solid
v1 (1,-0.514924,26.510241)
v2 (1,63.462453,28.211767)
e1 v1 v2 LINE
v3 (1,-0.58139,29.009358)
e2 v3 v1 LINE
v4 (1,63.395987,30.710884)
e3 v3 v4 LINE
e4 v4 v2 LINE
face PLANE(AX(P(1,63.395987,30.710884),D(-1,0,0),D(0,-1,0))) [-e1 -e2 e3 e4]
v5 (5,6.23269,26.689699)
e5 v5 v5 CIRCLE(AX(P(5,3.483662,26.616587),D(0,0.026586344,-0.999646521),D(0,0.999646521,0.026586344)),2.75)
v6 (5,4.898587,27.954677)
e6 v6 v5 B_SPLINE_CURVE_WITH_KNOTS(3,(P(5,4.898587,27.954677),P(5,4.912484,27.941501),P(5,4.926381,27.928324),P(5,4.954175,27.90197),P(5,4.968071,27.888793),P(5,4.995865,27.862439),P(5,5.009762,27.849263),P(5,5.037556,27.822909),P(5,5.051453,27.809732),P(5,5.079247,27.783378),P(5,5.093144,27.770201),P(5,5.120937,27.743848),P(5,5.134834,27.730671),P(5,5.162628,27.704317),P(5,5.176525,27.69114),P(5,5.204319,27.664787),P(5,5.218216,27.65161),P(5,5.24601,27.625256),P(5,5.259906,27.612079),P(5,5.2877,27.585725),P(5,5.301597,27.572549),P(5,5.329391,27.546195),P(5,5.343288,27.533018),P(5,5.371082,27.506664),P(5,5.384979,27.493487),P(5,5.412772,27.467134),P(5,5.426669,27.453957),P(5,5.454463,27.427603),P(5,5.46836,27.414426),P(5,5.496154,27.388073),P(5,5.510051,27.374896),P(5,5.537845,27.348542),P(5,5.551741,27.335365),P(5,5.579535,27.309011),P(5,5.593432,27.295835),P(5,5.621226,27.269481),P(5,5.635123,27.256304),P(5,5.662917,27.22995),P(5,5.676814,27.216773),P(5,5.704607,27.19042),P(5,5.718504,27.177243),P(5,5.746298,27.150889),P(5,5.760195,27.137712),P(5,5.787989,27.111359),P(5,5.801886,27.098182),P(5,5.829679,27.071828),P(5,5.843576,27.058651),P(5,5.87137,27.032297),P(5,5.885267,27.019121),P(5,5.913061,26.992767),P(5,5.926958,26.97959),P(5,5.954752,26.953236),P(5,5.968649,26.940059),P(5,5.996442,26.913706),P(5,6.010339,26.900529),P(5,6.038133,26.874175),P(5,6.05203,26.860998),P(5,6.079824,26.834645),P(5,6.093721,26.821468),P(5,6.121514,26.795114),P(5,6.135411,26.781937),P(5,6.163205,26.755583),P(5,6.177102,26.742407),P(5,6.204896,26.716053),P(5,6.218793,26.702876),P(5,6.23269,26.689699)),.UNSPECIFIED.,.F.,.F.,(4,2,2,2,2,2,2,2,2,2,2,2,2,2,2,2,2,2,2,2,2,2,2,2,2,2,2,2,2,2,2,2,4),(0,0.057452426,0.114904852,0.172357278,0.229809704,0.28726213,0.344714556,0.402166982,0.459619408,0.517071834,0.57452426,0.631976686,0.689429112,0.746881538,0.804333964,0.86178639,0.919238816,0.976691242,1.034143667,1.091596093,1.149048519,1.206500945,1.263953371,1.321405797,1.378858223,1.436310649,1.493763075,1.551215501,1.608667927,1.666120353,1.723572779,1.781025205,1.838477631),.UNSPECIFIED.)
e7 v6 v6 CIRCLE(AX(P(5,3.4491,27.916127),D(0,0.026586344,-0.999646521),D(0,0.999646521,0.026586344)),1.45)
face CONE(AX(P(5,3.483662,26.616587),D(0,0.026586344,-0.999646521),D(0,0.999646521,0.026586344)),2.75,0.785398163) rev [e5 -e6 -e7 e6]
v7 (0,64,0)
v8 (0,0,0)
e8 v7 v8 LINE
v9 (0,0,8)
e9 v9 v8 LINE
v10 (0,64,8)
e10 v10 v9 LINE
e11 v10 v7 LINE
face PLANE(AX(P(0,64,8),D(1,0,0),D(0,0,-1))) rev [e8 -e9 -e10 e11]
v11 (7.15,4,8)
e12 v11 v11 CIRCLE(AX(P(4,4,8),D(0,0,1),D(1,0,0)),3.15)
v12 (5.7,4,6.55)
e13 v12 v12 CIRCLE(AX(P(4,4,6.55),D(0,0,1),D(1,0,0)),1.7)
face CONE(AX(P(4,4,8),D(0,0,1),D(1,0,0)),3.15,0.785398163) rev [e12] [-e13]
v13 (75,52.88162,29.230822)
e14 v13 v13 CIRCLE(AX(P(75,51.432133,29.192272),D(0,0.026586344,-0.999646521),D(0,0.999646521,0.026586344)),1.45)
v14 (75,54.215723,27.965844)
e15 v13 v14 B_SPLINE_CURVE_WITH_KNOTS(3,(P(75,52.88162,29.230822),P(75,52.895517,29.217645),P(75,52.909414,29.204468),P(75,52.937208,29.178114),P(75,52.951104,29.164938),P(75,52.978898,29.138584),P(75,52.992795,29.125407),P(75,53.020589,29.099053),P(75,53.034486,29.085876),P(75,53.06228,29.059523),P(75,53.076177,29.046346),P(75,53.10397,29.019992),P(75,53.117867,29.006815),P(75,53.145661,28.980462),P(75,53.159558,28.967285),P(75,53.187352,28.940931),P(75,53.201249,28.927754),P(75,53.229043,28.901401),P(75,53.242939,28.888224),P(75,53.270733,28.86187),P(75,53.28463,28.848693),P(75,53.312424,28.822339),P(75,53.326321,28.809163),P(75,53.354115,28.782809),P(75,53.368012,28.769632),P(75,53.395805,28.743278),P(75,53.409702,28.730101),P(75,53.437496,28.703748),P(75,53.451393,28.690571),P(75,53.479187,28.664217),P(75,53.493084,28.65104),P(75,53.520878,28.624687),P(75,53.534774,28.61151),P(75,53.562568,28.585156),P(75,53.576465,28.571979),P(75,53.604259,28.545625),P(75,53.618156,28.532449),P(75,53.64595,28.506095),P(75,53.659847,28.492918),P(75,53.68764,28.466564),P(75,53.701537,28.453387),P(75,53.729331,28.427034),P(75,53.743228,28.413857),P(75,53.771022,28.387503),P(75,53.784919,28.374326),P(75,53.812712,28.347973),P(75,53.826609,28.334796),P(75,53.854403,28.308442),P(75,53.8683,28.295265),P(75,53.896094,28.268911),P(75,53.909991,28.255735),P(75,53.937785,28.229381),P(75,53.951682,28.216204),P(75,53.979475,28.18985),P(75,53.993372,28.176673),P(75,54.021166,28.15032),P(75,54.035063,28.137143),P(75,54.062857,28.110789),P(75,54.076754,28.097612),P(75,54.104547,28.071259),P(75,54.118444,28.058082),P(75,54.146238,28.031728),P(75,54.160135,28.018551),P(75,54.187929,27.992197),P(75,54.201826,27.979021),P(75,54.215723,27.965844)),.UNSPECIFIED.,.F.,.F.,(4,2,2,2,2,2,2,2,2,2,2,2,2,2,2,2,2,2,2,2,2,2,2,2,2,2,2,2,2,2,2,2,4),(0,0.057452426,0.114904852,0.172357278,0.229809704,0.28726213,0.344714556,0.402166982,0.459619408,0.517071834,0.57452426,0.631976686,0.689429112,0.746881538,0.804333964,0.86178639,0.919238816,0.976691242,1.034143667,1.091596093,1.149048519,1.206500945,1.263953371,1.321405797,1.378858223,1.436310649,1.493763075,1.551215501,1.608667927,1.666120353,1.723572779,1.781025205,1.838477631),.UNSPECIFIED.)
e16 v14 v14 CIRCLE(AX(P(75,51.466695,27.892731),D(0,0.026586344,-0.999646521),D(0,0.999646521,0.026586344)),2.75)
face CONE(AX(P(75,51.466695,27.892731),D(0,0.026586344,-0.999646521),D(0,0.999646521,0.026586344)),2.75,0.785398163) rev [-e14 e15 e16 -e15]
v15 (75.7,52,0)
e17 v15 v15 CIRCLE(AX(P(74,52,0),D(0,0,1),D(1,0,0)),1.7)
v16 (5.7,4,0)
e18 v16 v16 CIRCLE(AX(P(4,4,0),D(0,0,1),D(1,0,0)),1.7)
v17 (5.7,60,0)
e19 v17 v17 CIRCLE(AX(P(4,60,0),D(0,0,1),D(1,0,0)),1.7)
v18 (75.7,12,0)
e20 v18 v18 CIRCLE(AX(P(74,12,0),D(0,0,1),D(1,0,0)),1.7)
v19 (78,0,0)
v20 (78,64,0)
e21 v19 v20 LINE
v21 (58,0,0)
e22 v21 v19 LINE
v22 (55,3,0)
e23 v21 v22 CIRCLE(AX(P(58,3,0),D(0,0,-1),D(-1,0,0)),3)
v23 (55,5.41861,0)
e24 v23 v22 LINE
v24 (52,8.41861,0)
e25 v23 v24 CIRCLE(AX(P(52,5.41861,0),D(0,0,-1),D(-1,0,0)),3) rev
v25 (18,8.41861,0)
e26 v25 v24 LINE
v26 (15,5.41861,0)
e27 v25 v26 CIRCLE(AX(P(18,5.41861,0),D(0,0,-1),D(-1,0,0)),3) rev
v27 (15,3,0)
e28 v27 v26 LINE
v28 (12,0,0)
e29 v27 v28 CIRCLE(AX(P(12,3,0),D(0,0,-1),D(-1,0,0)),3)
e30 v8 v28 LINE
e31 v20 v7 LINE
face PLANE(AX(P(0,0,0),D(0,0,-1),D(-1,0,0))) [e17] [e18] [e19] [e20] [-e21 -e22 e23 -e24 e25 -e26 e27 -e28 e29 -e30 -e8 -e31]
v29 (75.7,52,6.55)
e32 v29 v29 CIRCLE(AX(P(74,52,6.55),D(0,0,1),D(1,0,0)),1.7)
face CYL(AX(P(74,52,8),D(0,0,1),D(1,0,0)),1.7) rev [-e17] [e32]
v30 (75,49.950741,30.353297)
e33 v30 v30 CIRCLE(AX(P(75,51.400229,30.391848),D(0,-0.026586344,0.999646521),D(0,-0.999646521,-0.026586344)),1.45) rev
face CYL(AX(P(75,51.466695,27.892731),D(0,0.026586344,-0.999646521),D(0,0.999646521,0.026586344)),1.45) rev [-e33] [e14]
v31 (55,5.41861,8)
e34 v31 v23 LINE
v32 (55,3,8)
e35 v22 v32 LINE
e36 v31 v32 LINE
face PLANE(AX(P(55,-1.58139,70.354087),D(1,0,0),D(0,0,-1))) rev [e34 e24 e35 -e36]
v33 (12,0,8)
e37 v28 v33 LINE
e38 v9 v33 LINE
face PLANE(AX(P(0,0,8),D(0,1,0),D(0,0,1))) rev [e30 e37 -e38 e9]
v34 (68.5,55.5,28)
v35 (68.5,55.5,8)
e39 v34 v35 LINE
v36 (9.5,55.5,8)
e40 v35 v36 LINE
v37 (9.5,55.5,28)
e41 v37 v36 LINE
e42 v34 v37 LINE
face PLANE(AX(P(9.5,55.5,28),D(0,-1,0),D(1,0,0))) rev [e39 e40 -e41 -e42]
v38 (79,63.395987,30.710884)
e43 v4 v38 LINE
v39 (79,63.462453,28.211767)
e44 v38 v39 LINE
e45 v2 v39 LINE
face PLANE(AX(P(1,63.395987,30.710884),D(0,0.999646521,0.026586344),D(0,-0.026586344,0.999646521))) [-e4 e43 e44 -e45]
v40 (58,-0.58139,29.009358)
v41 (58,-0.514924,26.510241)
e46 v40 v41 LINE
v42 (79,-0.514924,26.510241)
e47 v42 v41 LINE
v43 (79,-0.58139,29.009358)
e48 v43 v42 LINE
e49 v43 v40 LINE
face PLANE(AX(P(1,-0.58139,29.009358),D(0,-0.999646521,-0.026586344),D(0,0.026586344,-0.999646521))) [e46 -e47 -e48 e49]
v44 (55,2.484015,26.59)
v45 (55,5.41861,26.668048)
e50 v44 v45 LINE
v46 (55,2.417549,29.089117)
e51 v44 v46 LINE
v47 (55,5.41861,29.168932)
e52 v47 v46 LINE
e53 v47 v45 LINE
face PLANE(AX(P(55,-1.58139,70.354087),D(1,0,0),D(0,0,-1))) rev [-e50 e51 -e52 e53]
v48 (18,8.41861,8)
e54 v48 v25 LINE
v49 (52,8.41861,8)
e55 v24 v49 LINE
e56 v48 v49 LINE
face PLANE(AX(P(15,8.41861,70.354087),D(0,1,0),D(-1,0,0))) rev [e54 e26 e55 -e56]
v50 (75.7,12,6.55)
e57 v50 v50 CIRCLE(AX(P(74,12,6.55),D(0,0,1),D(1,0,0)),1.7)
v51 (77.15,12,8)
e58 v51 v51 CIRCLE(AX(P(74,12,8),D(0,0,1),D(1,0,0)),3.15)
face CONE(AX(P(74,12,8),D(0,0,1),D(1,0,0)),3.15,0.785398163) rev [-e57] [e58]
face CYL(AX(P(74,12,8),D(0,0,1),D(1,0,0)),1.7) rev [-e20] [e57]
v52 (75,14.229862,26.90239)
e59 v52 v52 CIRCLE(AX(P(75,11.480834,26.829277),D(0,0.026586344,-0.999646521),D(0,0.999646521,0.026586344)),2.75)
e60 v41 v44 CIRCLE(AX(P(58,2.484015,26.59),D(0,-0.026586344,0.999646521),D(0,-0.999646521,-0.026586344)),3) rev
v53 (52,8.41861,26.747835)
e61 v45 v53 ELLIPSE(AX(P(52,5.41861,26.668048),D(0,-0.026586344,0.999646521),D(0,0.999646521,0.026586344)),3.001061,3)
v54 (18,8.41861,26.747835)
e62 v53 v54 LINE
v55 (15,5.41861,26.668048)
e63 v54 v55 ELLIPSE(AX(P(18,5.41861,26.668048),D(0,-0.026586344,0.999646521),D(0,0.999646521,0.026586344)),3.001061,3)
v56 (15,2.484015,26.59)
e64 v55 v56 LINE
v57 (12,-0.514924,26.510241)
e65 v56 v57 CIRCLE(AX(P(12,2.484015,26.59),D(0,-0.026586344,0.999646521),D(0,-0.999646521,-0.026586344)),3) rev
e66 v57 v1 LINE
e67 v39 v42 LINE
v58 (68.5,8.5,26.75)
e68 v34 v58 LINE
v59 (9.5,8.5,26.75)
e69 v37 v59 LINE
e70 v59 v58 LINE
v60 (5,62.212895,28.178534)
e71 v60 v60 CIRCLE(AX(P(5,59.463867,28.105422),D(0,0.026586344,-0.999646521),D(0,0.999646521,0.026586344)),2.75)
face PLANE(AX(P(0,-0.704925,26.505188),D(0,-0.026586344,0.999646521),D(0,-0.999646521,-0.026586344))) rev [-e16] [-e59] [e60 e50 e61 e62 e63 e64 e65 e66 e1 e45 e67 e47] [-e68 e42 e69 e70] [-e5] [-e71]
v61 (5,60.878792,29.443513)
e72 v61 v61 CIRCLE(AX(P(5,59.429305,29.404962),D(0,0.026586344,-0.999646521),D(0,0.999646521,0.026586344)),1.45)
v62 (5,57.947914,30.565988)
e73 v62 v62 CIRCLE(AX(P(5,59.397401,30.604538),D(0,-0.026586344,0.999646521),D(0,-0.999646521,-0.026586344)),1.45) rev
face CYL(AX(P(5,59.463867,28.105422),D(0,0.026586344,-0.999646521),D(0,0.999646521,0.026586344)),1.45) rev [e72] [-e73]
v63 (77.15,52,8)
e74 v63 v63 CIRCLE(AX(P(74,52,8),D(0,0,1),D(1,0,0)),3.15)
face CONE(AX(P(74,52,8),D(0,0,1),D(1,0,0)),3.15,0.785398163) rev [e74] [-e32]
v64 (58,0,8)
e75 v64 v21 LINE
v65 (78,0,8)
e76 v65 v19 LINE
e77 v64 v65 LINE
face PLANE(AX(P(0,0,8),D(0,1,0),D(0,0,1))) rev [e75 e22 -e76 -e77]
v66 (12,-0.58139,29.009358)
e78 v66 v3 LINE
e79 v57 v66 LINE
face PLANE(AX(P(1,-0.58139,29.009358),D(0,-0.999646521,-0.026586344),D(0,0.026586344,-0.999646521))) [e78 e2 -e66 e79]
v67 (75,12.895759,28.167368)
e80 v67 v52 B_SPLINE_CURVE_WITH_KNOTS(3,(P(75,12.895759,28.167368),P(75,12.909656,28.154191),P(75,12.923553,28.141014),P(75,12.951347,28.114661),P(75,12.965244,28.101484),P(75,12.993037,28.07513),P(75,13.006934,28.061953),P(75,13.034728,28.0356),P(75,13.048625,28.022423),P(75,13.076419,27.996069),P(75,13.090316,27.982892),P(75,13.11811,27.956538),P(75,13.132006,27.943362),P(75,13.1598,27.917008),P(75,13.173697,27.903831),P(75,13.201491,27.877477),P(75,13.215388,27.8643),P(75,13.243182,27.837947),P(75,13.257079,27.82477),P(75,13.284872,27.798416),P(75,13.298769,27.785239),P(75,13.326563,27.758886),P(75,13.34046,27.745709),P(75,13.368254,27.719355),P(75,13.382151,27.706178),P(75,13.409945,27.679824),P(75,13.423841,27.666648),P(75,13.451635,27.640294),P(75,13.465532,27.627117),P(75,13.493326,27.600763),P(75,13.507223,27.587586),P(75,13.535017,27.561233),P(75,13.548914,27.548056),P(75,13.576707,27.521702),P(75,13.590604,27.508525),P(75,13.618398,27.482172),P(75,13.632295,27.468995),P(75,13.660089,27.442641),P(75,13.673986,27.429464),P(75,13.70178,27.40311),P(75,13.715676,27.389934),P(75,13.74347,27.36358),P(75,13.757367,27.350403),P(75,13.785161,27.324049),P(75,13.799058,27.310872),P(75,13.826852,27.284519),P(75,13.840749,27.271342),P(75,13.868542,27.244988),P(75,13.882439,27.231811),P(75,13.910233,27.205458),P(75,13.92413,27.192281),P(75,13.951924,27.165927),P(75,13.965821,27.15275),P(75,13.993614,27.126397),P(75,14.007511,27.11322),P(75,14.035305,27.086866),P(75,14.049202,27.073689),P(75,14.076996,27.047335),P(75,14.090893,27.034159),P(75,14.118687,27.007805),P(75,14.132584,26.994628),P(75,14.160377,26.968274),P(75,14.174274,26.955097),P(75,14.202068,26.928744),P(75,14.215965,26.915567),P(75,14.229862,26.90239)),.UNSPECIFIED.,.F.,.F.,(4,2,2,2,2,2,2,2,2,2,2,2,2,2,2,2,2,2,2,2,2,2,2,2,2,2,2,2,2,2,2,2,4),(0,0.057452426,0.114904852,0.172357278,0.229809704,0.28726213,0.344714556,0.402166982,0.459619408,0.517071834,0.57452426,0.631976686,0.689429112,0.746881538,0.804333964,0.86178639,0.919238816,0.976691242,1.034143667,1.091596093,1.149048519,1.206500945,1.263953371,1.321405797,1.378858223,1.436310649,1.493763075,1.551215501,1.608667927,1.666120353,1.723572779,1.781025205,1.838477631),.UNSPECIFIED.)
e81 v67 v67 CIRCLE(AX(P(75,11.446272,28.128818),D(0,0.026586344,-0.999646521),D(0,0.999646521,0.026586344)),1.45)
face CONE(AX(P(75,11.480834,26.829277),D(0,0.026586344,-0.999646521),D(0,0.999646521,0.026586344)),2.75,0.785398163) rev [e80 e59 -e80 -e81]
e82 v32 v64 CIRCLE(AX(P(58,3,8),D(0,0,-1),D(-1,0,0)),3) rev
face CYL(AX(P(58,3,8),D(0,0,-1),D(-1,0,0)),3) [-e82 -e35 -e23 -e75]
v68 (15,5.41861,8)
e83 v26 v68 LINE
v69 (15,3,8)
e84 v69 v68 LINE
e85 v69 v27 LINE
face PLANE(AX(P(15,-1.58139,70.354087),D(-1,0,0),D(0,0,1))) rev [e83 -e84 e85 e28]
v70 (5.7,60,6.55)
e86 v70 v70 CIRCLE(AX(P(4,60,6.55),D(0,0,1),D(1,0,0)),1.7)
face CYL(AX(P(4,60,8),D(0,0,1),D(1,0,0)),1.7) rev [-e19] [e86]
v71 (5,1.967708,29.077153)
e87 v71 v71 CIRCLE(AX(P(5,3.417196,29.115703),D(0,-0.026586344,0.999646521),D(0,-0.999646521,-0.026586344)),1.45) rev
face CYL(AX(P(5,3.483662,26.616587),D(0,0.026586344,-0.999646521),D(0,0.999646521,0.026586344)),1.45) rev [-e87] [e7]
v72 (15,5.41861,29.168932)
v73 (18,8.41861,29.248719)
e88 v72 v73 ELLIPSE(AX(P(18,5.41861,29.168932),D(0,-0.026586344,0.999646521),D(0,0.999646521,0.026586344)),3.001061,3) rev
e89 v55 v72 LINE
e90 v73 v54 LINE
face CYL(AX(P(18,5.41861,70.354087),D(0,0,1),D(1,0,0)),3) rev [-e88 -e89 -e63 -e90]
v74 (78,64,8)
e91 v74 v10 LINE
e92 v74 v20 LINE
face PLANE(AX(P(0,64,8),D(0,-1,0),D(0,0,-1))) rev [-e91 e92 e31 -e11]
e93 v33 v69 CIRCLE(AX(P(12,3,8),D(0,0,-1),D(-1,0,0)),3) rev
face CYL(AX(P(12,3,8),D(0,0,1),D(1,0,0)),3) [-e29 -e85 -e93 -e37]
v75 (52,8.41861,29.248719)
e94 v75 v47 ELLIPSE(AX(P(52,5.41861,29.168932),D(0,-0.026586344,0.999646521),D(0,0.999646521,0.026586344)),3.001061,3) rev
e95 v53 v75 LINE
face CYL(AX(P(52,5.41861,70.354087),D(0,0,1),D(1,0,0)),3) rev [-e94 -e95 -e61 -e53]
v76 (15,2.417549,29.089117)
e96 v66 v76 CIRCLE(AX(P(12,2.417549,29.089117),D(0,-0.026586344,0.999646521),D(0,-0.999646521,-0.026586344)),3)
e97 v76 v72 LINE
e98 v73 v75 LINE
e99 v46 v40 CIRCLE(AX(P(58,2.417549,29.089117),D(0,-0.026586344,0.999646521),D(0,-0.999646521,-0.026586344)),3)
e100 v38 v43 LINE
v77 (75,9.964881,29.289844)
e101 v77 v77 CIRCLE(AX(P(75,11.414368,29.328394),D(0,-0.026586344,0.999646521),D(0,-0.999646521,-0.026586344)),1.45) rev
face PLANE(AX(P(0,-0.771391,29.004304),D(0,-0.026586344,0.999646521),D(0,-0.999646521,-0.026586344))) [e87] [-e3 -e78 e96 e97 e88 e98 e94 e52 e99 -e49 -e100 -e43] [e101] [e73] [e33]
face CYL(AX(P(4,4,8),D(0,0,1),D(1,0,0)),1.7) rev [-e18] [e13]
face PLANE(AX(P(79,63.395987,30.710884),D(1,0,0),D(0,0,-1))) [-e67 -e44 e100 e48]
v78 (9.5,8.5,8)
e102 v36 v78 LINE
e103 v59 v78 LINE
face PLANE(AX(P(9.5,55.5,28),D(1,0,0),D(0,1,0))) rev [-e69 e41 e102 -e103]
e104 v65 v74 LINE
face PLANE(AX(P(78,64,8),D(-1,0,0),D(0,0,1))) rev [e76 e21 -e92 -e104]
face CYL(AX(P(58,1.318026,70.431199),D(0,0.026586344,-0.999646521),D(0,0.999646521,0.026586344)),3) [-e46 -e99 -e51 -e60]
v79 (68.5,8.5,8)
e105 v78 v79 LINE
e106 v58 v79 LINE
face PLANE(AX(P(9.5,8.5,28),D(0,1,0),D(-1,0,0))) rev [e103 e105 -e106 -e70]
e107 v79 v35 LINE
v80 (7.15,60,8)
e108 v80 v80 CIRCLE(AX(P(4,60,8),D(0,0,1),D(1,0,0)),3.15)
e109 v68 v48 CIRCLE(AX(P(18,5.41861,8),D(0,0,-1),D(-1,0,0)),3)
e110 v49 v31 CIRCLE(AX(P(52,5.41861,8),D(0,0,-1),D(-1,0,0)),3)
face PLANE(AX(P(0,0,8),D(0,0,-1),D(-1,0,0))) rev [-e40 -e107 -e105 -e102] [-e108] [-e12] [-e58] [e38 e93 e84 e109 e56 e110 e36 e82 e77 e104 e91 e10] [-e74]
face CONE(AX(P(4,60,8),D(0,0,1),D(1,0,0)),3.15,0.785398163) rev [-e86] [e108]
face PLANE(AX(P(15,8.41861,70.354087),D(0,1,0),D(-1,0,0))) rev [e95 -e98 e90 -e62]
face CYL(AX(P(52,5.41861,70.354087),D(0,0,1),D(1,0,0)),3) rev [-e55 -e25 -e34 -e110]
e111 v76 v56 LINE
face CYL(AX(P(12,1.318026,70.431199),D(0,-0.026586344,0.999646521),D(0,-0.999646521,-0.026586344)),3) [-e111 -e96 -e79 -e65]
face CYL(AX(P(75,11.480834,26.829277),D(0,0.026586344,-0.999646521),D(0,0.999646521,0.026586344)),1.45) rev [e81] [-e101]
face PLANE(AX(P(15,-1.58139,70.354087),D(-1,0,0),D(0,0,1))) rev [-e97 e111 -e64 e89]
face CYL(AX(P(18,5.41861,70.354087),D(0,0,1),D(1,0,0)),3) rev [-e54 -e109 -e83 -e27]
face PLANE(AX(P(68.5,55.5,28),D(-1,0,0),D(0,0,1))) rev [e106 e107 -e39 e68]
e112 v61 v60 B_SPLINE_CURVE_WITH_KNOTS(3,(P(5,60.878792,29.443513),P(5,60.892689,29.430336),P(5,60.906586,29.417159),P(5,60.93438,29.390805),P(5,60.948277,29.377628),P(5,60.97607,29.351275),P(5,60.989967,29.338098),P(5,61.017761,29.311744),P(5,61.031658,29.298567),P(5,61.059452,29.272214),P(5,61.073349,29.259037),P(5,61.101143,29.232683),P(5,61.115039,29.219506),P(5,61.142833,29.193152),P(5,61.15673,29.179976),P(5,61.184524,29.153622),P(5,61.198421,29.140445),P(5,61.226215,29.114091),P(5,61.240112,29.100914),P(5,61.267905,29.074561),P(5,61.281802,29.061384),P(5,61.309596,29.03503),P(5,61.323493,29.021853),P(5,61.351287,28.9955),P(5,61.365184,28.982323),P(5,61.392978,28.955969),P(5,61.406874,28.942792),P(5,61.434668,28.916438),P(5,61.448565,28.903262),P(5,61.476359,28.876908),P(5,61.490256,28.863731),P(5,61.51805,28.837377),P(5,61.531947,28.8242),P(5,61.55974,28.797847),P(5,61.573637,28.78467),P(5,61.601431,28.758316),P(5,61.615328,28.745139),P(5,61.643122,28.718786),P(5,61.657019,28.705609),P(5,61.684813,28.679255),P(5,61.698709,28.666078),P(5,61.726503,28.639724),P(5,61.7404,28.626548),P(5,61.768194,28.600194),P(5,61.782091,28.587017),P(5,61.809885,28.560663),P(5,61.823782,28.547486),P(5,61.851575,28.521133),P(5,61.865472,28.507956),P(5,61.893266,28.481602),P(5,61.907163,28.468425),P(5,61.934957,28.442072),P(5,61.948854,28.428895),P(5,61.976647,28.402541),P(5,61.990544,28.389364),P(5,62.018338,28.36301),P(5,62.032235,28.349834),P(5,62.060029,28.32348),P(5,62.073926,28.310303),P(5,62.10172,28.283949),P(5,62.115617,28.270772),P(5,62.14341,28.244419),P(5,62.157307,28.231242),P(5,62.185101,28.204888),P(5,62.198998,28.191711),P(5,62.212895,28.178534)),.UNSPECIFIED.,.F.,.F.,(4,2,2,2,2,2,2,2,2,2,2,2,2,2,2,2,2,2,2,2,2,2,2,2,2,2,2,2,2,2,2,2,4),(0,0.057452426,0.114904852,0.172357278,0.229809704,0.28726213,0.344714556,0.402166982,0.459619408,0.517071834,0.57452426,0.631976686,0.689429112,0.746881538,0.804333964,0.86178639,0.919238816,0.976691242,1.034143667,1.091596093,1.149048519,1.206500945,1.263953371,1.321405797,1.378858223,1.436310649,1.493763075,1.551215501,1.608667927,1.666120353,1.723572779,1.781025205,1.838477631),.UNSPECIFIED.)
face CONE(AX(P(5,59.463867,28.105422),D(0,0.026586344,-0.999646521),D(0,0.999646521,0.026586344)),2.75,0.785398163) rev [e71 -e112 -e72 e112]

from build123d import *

# Parameters (mm, degrees)
ESQUISSE1_W                                      = 78
ESQUISSE1_H                                      = 64
ESQUISSE1_R                                      = 1.5
BOSS_EXTRU_1_DEPTH                               = 8
FRAISAGE_POUR_VIS_T_TE_FRAIS_E_M31_D             = 3.4
FRAISAGE_POUR_VIS_T_TE_FRAIS_E_M31_DEPTH         = 8
FRAISAGE_POUR_VIS_T_TE_FRAIS_E_M31_CSINK_D       = 6.3
FRAISAGE_POUR_VIS_T_TE_FRAIS_E_M31_CSINK_ANGLE   = 90
ESQUISSE4_W                                      = 59
ESQUISSE4_H                                      = 47
BOSS_EXTRU_2_DEPTH                               = 20
ENL_V_START                                      = -27.764118658
ENL_V_MAT_EXTRU_1_OUTLINE_W                      = 62
ENL_V_MAT_EXTRU_1_OUTLINE_H                      = 50
ENL_V_MAT_EXTRU_1_DEPTH                          = 1.24955815
ESQUISSE14_W                                     = 78
ESQUISSE14_H                                     = 64
ESQUISSE14_R                                     = 1
BOSS_EXTRU_4_DEPTH                               = 2.5
FRAISAGE_POUR_VIS_T_TE_FRAIS_E_M2_53_D           = 2.9
FRAISAGE_POUR_VIS_T_TE_FRAIS_E_M2_53_DEPTH       = 2.5
FRAISAGE_POUR_VIS_T_TE_FRAIS_E_M2_53_CSINK_D     = 5.5
FRAISAGE_POUR_VIS_T_TE_FRAIS_E_M2_53_CSINK_ANGLE = 90
FRAISAGE_POUR_VIS_T_TE_FRAIS_E_M2_53_TIP         = 0.871247898
ENL_V_MAT_EXTRU_2_REACH                          = 108.208
ESQUISSE20_W                                     = 40
ESQUISSE20_H                                     = 10
CONG_1_R                                         = 3


# Read off the part's stored shape, not the designer's step: Enlèv. mat.-Extru.1
with BuildPart() as part:
    # Esquisse1 → Boss.-Extru.1 (new body)
    with BuildSketch(Plane.XY):
        with Locations((39, 32)):
            Rectangle(ESQUISSE1_W, ESQUISSE1_H)
        with Locations((4, 60)):
            Circle(ESQUISSE1_R, mode=Mode.SUBTRACT)
        with Locations((4, 4)):
            Circle(ESQUISSE1_R, mode=Mode.SUBTRACT)
        with Locations((74, 12)):
            Circle(ESQUISSE1_R, mode=Mode.SUBTRACT)
        with Locations((74, 52)):
            Circle(ESQUISSE1_R, mode=Mode.SUBTRACT)
    extrude(amount=BOSS_EXTRU_1_DEPTH)

    # Fraisage pour vis à tête fraisée M31
    with Locations(Plane.XY.offset(8)):
        with Locations((4, 60), (4, 4), (74, 12), (74, 52)):
            CounterSinkHole(FRAISAGE_POUR_VIS_T_TE_FRAIS_E_M31_D / 2, FRAISAGE_POUR_VIS_T_TE_FRAIS_E_M31_CSINK_D / 2, depth=FRAISAGE_POUR_VIS_T_TE_FRAIS_E_M31_DEPTH, counter_sink_angle=FRAISAGE_POUR_VIS_T_TE_FRAIS_E_M31_CSINK_ANGLE)

    # Esquisse4 → Boss.-Extru.2 (add)
    with BuildSketch(Plane.XY.offset(8)):
        with Locations((39, 32)):
            Rectangle(ESQUISSE4_W, ESQUISSE4_H)
    extrude(amount=BOSS_EXTRU_2_DEPTH)

    # Enlèv. mat.-Extru.1 outline → Enlèv. mat.-Extru.1 (cut)
    with BuildSketch(Plane(origin=(0, 0, 0), x_dir=(1, 0, 0), z_dir=(0, 0.026586343635431896, -0.9996465206922389)).offset(ENL_V_START)):
        with Locations((39, -33)):
            Rectangle(ENL_V_MAT_EXTRU_1_OUTLINE_W, ENL_V_MAT_EXTRU_1_OUTLINE_H)
    extrude(amount=ENL_V_MAT_EXTRU_1_DEPTH, mode=Mode.SUBTRACT)

    # Esquisse14 → Boss.-Extru.4 (add)
    with BuildSketch(Plane(origin=(0, 17.262764885, 26.983052258), x_dir=(1, 0, 0), z_dir=(0, 0.026586343635431917, -0.9996465206922389))):
        with Locations((40, -14.216024519)):
            Rectangle(ESQUISSE14_W, ESQUISSE14_H)
        with Locations(Location((5, 13.783975481, 0), (0, 0, 270))):
            Circle(ESQUISSE14_R, mode=Mode.SUBTRACT)
        with Locations(Location((5, -42.216024519, 0), (0, 0, 270))):
            Circle(ESQUISSE14_R, mode=Mode.SUBTRACT)
        with Locations(Location((75, -34.216024519, 0), (0, 0, 270))):
            Circle(ESQUISSE14_R, mode=Mode.SUBTRACT)
        with Locations(Location((75, 5.783975481, 0), (0, 0, 270))):
            Circle(ESQUISSE14_R, mode=Mode.SUBTRACT)
    extrude(amount=-BOSS_EXTRU_4_DEPTH)

    # Fraisage pour vis à tête fraisée M2.53
    with Locations(Plane(origin=(0, -0.704925217, 26.505188159), x_dir=(-1, 0, 0), z_dir=(0, 0.02658634363543186, -0.9996465206922389))):
        with Locations((-5, 60.190068073), (-5, 4.190068073), (-75, 12.190068073), (-75, 52.190068073)):
            CounterSinkHole(FRAISAGE_POUR_VIS_T_TE_FRAIS_E_M2_53_D / 2, FRAISAGE_POUR_VIS_T_TE_FRAIS_E_M2_53_CSINK_D / 2, depth=FRAISAGE_POUR_VIS_T_TE_FRAIS_E_M2_53_DEPTH, counter_sink_angle=FRAISAGE_POUR_VIS_T_TE_FRAIS_E_M2_53_CSINK_ANGLE)
            with Locations((0, 0, -(FRAISAGE_POUR_VIS_T_TE_FRAIS_E_M2_53_DEPTH + FRAISAGE_POUR_VIS_T_TE_FRAIS_E_M2_53_TIP / 2))):  # 118° drill point
                Cone(0, FRAISAGE_POUR_VIS_T_TE_FRAIS_E_M2_53_D / 2, FRAISAGE_POUR_VIS_T_TE_FRAIS_E_M2_53_TIP, mode=Mode.SUBTRACT)

    # Enlèv. mat.-Extru.2: up to this plane
    enl_v_mat_extru_2_end = Plane(origin=(0, -0.771391076, 29.004304461), z_dir=(0, -0.026586343635431952, 0.9996465206922389))
    # Esquisse20 → Enlèv. mat.-Extru.2 (cut, up to the surface)
    with BuildSketch(Plane(origin=(0, 0, 0), x_dir=(-1, 0, 0), z_dir=(0, 0, -1)), mode=Mode.PRIVATE) as enl_v_mat_extru_2_sk1:
        with Locations((-35, 3.418609812)):
            Rectangle(ESQUISSE20_W, ESQUISSE20_H)
    enl_v_mat_extru_2_tool1 = split(extrude(enl_v_mat_extru_2_sk1.sketch, amount=-ENL_V_MAT_EXTRU_2_REACH, mode=Mode.PRIVATE), bisect_by=enl_v_mat_extru_2_end, keep=Keep.BOTH, mode=Mode.PRIVATE)
    add(enl_v_mat_extru_2_tool1.solids().sort_by_distance((35, 3.41861, 0))[0], mode=Mode.SUBTRACT)

    # Congé1
    cong_1_edges = [part.edges().sort_by_distance(p)[0] for p in [
        (15, -0.548157258, 27.759799525),
        (55, -0.548157258, 27.759799525),
        (55, 8.418609812, 4),
        (55, 8.418609812, 27.998277373),
        (55, 0, 4),
        (15, 0, 4),
        (15, 8.418609812, 4),
        (15, 8.418609812, 27.998277373),
    ]]
    fillet(cong_1_edges, radius=CONG_1_R)


solid = part.part
